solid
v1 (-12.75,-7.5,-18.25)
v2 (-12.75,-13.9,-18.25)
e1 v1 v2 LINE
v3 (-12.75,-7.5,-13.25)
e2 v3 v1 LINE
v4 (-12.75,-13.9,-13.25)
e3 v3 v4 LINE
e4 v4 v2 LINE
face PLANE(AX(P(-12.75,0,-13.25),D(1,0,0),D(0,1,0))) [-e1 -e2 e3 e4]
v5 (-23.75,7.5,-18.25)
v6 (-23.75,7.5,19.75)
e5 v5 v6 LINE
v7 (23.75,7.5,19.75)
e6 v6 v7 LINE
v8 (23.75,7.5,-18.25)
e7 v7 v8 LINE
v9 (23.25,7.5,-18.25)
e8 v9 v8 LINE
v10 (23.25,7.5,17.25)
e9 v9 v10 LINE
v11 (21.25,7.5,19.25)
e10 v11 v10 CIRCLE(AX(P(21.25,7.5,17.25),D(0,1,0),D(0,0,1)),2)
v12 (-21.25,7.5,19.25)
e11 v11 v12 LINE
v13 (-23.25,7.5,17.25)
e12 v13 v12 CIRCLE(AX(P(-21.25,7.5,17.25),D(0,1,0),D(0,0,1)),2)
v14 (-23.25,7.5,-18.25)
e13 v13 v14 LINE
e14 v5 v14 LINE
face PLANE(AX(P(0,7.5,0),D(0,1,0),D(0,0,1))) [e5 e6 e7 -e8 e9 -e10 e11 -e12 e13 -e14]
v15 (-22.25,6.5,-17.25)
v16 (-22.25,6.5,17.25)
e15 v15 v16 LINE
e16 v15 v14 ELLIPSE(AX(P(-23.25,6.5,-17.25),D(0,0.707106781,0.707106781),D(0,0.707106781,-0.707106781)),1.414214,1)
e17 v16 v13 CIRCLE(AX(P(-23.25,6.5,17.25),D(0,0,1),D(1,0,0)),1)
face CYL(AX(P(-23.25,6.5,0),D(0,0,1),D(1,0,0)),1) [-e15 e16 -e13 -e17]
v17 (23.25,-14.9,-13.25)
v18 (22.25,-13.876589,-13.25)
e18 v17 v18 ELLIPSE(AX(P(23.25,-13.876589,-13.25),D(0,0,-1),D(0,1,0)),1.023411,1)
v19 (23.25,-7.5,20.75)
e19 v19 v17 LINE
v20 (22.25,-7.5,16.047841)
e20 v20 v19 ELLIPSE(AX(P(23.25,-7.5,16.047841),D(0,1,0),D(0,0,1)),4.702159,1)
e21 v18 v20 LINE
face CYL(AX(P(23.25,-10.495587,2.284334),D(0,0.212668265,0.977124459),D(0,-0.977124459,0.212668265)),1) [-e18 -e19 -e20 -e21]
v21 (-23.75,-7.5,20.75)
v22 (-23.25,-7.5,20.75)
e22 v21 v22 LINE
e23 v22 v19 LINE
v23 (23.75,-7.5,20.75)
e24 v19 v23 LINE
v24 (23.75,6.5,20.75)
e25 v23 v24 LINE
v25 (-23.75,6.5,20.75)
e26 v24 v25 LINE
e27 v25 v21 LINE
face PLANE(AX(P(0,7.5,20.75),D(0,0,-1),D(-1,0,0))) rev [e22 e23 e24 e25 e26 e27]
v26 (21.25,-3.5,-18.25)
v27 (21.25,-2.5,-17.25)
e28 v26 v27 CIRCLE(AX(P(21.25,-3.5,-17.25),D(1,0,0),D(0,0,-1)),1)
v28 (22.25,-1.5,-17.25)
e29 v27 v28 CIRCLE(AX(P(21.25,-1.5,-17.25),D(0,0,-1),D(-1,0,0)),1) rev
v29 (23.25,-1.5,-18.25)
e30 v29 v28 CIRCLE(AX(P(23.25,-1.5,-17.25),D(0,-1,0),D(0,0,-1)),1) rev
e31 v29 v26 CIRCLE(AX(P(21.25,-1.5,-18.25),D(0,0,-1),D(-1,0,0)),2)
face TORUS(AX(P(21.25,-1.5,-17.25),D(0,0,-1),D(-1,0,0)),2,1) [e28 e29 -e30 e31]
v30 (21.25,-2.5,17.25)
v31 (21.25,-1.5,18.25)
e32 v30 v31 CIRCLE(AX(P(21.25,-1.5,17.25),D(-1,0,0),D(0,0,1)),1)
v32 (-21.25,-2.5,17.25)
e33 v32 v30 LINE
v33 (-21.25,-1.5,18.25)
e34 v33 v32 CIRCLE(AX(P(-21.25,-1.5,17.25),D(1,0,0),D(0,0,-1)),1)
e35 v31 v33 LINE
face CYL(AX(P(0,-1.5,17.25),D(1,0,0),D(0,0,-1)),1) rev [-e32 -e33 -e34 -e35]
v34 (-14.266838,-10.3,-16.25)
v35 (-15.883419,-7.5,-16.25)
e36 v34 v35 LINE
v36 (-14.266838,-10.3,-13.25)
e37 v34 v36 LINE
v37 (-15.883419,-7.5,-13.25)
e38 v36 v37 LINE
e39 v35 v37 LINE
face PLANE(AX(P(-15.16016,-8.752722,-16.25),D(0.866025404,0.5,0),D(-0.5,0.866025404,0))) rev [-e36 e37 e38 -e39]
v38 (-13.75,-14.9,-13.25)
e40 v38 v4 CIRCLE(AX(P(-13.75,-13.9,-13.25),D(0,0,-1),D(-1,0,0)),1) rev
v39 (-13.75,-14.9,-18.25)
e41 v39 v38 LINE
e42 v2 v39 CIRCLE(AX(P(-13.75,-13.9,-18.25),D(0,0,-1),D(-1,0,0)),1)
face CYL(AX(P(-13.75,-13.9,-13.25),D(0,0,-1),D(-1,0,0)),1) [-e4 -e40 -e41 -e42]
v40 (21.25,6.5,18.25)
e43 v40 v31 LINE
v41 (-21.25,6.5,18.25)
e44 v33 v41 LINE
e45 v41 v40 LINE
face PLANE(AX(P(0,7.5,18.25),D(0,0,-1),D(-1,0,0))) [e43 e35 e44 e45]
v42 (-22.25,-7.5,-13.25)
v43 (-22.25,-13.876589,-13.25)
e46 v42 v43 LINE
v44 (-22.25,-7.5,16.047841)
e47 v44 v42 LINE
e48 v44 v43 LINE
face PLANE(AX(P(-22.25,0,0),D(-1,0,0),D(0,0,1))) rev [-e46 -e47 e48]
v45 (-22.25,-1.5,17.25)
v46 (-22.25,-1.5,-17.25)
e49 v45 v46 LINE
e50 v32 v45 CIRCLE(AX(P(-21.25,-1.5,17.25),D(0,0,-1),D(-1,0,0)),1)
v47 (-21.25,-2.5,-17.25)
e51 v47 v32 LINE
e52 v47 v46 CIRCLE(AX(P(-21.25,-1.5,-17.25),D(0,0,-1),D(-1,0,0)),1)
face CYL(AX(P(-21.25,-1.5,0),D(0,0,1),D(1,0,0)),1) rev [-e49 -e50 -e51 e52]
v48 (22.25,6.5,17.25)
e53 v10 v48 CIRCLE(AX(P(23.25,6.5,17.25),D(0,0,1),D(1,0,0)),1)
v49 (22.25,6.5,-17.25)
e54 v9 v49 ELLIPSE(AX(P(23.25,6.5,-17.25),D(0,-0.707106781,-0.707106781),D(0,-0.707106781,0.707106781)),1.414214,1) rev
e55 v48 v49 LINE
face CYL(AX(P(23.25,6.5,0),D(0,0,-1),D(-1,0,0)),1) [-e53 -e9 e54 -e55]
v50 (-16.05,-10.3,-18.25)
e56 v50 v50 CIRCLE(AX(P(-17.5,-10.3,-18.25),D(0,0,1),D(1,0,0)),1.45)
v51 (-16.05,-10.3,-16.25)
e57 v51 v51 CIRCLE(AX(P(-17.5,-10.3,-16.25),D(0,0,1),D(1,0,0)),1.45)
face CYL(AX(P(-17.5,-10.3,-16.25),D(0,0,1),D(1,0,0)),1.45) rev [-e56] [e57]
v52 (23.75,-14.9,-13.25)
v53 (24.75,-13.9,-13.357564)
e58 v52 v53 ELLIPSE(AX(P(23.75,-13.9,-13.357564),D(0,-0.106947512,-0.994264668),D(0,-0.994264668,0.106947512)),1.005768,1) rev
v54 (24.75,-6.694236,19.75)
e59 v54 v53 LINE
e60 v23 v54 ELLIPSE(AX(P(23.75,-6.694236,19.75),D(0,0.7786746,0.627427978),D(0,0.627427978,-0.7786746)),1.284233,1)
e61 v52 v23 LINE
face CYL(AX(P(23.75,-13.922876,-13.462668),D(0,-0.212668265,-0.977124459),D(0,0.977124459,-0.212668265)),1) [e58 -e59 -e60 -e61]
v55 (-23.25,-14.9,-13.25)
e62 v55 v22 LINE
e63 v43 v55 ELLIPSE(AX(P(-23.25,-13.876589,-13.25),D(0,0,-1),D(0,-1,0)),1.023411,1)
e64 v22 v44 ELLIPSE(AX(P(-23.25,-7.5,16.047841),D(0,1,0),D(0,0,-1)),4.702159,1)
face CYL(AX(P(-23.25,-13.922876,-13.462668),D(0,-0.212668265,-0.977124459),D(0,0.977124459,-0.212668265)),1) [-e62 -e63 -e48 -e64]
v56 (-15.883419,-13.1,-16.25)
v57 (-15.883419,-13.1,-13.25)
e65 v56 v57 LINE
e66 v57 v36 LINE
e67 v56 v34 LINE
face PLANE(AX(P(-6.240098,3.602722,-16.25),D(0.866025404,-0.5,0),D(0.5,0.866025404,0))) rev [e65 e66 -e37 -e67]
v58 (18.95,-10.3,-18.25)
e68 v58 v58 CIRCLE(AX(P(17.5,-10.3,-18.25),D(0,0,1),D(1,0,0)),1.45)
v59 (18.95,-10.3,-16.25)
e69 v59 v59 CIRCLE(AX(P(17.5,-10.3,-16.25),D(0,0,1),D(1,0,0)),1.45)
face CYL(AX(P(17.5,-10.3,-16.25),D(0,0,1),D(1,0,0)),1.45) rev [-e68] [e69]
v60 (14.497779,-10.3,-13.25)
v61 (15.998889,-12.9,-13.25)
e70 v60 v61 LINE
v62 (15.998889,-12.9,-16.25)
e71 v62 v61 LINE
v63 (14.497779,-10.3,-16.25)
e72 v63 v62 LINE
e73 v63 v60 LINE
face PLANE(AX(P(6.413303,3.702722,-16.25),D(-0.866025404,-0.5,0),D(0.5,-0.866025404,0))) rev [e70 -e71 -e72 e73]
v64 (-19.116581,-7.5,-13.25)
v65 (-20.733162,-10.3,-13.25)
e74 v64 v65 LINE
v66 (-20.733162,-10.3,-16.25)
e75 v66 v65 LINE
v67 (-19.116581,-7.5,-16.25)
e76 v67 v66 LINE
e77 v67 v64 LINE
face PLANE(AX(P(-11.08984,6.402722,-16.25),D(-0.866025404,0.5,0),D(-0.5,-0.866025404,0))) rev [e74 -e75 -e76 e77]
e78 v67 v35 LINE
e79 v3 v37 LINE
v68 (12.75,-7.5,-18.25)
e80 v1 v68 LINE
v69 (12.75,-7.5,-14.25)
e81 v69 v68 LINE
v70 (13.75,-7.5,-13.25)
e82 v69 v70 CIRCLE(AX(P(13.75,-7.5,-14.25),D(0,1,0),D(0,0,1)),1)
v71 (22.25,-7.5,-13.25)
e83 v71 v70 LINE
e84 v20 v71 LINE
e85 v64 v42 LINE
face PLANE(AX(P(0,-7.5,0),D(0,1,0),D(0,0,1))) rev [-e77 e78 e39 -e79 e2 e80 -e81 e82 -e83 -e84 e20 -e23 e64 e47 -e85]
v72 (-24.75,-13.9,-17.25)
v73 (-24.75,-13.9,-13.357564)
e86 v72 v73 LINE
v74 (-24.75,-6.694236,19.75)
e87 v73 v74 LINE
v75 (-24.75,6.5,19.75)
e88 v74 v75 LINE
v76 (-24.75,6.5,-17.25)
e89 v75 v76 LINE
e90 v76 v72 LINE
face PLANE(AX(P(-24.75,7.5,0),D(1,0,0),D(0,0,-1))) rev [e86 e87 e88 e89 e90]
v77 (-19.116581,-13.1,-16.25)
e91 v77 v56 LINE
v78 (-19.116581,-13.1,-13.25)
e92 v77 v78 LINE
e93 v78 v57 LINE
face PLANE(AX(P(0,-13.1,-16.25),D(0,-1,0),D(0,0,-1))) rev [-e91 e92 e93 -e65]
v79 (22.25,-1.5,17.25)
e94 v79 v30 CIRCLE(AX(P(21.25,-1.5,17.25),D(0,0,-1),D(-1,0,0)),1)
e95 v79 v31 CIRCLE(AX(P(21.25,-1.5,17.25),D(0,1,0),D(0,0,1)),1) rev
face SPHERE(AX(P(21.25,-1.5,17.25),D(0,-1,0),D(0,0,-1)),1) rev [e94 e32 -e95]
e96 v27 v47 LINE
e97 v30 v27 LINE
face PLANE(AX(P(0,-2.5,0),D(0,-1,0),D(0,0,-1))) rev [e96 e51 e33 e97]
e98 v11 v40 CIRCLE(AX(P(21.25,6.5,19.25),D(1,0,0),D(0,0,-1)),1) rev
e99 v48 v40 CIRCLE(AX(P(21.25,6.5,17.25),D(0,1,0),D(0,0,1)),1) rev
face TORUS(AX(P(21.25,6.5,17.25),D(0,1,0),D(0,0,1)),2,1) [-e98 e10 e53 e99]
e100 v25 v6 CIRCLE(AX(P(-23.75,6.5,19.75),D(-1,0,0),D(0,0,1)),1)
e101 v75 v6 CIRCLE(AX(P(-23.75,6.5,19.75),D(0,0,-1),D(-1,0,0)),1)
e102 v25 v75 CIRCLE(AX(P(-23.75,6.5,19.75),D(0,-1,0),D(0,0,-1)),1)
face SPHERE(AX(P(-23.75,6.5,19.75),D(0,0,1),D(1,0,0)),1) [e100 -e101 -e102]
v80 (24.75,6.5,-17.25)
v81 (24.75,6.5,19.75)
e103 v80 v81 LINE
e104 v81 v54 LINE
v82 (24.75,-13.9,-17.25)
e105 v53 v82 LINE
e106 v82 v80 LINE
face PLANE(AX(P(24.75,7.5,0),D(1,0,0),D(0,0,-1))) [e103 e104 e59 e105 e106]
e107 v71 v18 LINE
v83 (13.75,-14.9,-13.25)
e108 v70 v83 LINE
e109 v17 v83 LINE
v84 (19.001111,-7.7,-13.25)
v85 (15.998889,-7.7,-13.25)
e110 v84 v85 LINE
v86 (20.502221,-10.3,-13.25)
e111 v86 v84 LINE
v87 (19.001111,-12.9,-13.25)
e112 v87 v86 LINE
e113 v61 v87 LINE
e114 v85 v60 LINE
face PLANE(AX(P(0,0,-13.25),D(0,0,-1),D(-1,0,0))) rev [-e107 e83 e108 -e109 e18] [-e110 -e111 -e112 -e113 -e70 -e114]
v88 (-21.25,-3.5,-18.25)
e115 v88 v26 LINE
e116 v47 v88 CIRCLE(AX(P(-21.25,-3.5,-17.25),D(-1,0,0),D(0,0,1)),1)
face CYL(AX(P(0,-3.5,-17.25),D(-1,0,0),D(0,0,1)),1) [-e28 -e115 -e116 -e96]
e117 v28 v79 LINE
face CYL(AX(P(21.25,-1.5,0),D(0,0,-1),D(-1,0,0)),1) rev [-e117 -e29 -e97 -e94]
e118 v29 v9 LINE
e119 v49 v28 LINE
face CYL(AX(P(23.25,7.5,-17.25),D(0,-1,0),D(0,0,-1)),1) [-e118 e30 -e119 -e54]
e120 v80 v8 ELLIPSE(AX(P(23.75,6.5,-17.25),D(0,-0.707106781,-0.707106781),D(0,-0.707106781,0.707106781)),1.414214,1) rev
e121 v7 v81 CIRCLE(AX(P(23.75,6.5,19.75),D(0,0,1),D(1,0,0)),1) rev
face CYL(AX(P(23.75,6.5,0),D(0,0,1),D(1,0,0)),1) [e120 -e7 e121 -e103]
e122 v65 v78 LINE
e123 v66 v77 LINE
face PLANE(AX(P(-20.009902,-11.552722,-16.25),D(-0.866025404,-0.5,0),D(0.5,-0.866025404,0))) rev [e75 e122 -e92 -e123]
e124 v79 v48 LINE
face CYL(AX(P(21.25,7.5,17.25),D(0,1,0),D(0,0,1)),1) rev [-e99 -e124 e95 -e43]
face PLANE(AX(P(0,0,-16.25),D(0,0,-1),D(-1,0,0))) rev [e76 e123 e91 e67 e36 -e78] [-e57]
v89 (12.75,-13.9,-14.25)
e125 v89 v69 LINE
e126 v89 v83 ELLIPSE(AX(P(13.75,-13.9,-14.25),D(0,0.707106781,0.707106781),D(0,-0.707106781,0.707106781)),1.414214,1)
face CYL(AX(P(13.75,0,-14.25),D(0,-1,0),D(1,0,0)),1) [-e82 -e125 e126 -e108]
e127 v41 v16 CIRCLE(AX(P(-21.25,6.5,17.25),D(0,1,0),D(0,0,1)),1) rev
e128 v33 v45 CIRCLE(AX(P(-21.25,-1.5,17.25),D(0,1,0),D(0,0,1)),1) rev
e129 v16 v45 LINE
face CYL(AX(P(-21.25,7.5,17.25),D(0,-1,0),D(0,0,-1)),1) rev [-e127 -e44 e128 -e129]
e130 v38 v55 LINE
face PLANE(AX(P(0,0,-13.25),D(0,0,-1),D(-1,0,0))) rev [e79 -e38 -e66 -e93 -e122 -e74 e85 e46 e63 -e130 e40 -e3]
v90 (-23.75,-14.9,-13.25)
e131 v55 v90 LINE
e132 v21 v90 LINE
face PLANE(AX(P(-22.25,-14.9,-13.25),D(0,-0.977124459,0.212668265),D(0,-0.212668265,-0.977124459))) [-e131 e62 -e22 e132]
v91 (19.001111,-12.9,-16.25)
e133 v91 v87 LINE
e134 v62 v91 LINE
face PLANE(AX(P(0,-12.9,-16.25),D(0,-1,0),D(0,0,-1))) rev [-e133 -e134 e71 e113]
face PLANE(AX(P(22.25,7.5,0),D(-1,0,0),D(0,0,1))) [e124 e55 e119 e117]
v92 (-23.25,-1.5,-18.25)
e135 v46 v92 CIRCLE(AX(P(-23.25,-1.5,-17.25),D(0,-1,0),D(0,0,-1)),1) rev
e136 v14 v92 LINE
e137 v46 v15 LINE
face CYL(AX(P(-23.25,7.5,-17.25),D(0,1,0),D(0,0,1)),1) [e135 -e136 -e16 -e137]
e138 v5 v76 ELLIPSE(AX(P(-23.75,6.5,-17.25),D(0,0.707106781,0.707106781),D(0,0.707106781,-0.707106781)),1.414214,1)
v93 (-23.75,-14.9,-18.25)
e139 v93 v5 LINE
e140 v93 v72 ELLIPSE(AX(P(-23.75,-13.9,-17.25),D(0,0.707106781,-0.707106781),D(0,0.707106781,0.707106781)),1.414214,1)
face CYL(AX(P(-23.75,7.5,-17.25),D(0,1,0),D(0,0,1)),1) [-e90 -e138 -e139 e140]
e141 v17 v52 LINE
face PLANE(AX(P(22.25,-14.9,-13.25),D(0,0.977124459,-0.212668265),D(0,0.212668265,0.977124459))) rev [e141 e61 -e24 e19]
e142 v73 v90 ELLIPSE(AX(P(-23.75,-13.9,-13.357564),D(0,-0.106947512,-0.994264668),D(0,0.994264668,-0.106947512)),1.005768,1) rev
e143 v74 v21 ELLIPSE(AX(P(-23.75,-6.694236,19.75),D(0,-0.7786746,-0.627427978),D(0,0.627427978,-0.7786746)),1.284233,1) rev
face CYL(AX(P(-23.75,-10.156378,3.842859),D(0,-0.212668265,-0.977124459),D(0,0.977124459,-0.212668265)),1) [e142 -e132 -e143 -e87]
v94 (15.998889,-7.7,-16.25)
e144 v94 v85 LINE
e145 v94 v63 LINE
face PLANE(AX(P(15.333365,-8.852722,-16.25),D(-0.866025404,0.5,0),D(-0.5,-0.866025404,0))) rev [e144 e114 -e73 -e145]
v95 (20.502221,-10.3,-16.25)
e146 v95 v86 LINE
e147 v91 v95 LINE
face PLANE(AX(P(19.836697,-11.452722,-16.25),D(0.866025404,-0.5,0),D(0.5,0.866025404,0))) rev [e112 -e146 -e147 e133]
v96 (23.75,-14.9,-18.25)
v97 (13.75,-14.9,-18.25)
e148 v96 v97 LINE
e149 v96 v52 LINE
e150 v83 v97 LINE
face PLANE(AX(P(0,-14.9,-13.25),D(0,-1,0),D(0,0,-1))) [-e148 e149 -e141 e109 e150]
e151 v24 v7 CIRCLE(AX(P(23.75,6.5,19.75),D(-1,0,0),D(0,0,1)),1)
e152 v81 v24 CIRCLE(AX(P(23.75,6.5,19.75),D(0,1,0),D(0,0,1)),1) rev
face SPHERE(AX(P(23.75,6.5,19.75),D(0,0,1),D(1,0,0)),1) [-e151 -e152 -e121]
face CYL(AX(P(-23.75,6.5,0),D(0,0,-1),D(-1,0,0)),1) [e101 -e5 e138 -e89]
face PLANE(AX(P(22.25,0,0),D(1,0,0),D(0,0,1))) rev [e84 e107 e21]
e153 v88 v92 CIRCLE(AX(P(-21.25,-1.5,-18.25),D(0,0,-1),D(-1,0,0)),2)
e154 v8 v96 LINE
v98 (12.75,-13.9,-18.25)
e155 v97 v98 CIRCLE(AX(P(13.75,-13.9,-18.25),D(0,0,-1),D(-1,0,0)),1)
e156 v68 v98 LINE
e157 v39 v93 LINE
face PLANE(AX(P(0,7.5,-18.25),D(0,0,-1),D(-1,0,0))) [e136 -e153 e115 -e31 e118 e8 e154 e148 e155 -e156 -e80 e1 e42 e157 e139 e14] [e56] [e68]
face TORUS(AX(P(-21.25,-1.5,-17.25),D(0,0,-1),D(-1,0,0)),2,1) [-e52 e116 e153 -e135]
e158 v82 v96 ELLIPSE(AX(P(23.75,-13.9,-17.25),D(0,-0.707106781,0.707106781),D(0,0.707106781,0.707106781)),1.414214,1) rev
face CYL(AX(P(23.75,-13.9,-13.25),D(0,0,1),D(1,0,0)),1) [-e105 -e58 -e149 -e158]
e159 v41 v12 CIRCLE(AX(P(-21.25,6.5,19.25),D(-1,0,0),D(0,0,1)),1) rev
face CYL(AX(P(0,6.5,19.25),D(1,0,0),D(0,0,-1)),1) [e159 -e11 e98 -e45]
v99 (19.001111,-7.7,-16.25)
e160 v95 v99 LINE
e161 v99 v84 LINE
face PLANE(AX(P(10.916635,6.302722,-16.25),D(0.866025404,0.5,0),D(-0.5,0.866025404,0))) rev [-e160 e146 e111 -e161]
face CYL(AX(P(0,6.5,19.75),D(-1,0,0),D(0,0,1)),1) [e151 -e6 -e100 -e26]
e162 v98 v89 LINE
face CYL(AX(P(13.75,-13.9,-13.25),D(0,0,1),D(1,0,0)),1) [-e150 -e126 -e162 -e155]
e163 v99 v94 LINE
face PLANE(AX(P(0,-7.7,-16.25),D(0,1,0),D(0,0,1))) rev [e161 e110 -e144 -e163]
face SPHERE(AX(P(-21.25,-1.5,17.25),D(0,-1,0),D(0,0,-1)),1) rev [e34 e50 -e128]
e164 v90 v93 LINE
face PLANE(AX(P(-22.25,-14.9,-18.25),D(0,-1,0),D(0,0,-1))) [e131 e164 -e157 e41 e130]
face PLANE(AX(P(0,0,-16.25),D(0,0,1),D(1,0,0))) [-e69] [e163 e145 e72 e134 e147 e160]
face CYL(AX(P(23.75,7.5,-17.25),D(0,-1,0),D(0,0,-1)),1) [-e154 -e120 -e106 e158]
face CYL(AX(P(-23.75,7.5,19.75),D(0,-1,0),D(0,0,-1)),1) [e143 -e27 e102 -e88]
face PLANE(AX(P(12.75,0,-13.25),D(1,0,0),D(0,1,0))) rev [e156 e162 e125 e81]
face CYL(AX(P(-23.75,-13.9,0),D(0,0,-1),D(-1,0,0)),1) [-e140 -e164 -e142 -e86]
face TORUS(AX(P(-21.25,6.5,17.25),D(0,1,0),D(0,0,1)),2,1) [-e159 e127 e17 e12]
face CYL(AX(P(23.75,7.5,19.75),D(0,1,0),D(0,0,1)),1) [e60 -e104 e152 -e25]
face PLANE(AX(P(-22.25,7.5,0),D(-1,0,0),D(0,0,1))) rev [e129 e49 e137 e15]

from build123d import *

# Parameters (mm, degrees)
BOSS_EXTRUDE1_DEPTH    = 7.5
BOSS_EXTRUDE2_START    = -7.5
SKETCH1_3_W            = 44.5
SKETCH1_3_H            = 36.5
BOSS_EXTRUDE2_DEPTH    = 5
BOSS_EXTRUDE3_DEPTH    = 2.5
BOSS_EXTRUDE4_DEPTH    = 5
CUT_EXTRUDE1_START     = -5
CUT_EXTRUDE1_DEPTH     = 3
M2_5_CLEARANCE_HOLE1_D = 2.9
MIRROR1_START          = -16.25
MIRROR1_DEPTH          = 3
MIRROR1_START_2        = -18.25
MIRROR1_2_OUTLINE_R    = 1.45
MIRROR1_2_DEPTH        = 2
MIRROR1_3_DEPTH        = 3
MIRROR1_START_3        = 22.25
MIRROR1_4_DEPTH        = 2.5
FILLET1_R              = 1
FILLET2_R              = 1
FILLET6_R              = 1
FILLET7_R              = 1
FILLET8_R              = 1


with BuildPart() as part:
    # Sketch1 → Boss-Extrude1 (new, symmetric)
    with BuildSketch(Plane(origin=(0, 0, 0), x_dir=(1, 0, 0), z_dir=(0, 1, 0))):
        Polygon((22.25, -18.25), (-22.25, -18.25), (-22.25, 18.25), (-24.75, 18.25), (-24.75, -20.75), (24.75, -20.75), (24.75, 18.25), (22.25, 18.25), align=None)
    extrude(amount=BOSS_EXTRUDE1_DEPTH, both=True)

    # Sketch1<3> → Boss-Extrude2 (add)
    with BuildSketch(Plane(origin=(0, 0, 0), x_dir=(1, 0, 0), z_dir=(0, 1, 0)).offset(BOSS_EXTRUDE2_START)):
        Rectangle(SKETCH1_3_W, SKETCH1_3_H)
    extrude(amount=BOSS_EXTRUDE2_DEPTH)

    # Sketch5 → Boss-Extrude3 (add)
    with BuildSketch(Plane(origin=(-24.75, 32.25, 0), x_dir=(0, 1, 0), z_dir=(-1, 0, 0))):
        Polygon((-47.15, 18.25), (-39.75, 18.25), (-39.75, -20.75), (-47.15, 13.25), align=None)
    extrude(amount=-BOSS_EXTRUDE3_DEPTH)

    # Sketch6 → Boss-Extrude4 (add)
    with BuildSketch(Plane(origin=(0, 0, -18.25), x_dir=(-1, 0, 0), z_dir=(0, 0, -1))):
        Polygon((-12.75, -10.3), (-14.266838493, -10.3), (-15.883419246, -13.1), (-19.116580754, -13.1), (-20.733161507, -10.3), (-19.116580754, -7.5), (-22.25, -7.5), (-22.25, -14.9), (-12.75, -14.9), align=None)
        Polygon((22.25, -7.5), (12.75, -7.5), (12.75, -10.3), (12.75, -14.9), (22.25, -14.9), align=None)
    extrude(amount=-BOSS_EXTRUDE4_DEPTH)

    # Sketch6<3> → Cut-Extrude1 (cut)
    with BuildSketch(Plane(origin=(0, 0, -18.25), x_dir=(-1, 0, 0), z_dir=(0, 0, -1)).offset(CUT_EXTRUDE1_START)):
        Polygon((19.0011107, -7.7), (15.9988893, -7.7), (14.4977786, -10.3), (15.9988893, -12.9), (19.0011107, -12.9), (20.5022214, -10.3), align=None)
    extrude(amount=CUT_EXTRUDE1_DEPTH, mode=Mode.SUBTRACT)

    # M2.5 Clearance Hole1 (through all)
    with Locations(Plane.XY.offset(-16.25)):
        with Locations((-17.5, -10.3), (17.5, -10.3)):
            Hole(M2_5_CLEARANCE_HOLE1_D / 2)

    # Mirror1: read off the stored shape, not the designer's step
    # Mirror1 outline → Mirror1 (cut)
    with BuildSketch(Plane.XY.offset(MIRROR1_START)):
        Polygon((-14.266838493, -10.3), (-15.883419246, -7.5), (-19.116580754, -7.5), (-20.733161507, -10.3), (-19.116580754, -13.1), (-15.883419246, -13.1), align=None)
        Polygon((-15.9988893, -12.9), (-19.0011107, -12.9), (-20.5022214, -10.3), (-19.0011107, -7.7), (-15.9988893, -7.7), (-14.4977786, -10.3), align=None, mode=Mode.SUBTRACT)
    extrude(amount=MIRROR1_DEPTH, mode=Mode.SUBTRACT)

    # Mirror1 2 outline → Mirror1 2 (add)
    with BuildSketch(Plane.XY.offset(MIRROR1_START_2)):
        Polygon((20.733161507, -10.3), (19.116580754, -7.5), (12.75, -7.5), (12.75, -10.3), (14.266838493, -10.3), (15.883419246, -13.1), (19.116580754, -13.1), align=None)
        with Locations((17.5, -10.3)):
            Circle(MIRROR1_2_OUTLINE_R, mode=Mode.SUBTRACT)
    extrude(amount=MIRROR1_2_DEPTH)

    # Mirror1 3 outline → Mirror1 3 (add)
    with BuildSketch(Plane.XY.offset(MIRROR1_START)):
        Polygon((20.733161507, -10.3), (19.116580754, -7.5), (12.75, -7.5), (12.75, -10.3), (14.266838493, -10.3), (15.883419246, -13.1), (19.116580754, -13.1), align=None)
        Polygon((15.9988893, -7.7), (19.0011107, -7.7), (20.5022214, -10.3), (19.0011107, -12.9), (15.9988893, -12.9), (14.4977786, -10.3), align=None, mode=Mode.SUBTRACT)
    extrude(amount=MIRROR1_3_DEPTH)

    # Mirror1 4 outline → Mirror1 4 (add)
    with BuildSketch(Plane.YZ.offset(MIRROR1_START_3)):
        Polygon((-14.9, -13.25), (-14.9, -18.25), (-7.5, -18.25), (-7.5, 20.75), align=None)
    extrude(amount=MIRROR1_4_DEPTH)

    # Fillet1
    fillet1_edges = [part.edges().sort_by_distance(p)[0] for p in [
        (22.25, 7.5, 0),
        (-22.25, 2.5, -18.25),
        (-22.25, 2.5, 18.25),
        (22.25, 2.5, 18.25),
        (22.25, 2.5, -18.25),
        (0, 7.5, 18.25),
        (-22.25, 7.5, 0),
        (-22.25, -2.5, 0),
        (0, -2.5, -18.25),
        (0, -2.5, 18.25),
        (22.25, -2.5, 0),
    ]]
    fillet(fillet1_edges, radius=FILLET1_R)

    # Fillet2
    fillet2_edges = [part.edges().sort_by_distance(p)[0] for p in [
        (24.75, -14.9, -15.75),
        (24.75, -11.2, 3.75),
        (24.75, 0, 20.75),
        (-24.75, 0, 20.75),
        (-24.75, -3.7, -18.25),
        (24.75, -3.7, -18.25),
        (-24.75, 7.5, 1.25),
        (-24.75, -14.9, -15.75),
        (-24.75, -11.2, 3.75),
        (24.75, 7.5, 1.25),
    ]]
    fillet(fillet2_edges, radius=FILLET2_R)

    # Fillet6
    fillet6_edges = [part.edges().sort_by_distance(p)[0] for p in [
        (-12.75, -14.9, -15.75),
        (12.75, -14.9, -15.75),
        (12.75, -11.2, -13.25),
    ]]
    fillet(fillet6_edges, radius=FILLET6_R)

    # Fillet7
    # the kernel refuses this fillet: 1 mm, written as the material it takes off along each edge
    with BuildSketch(Plane(origin=(23.75, 6.5, 19.75), x_dir=(0, 0, 1), z_dir=(0, 1, 0))) as fillet7_piece_1_section:
        Polygon((0, 0), (FILLET7_R, 0), (FILLET7_R, FILLET7_R), (0, FILLET7_R), align=None)
    fillet7_piece_1 = extrude(amount=FILLET7_R, mode=Mode.PRIVATE)
    fillet7_piece_1 = fillet7_piece_1 - Plane(origin=(23.75, 6.5, 19.75), x_dir=(-0.7071067811865476, 0, -0.7071067811865475), z_dir=(0, 1, 0)) * Sphere(FILLET7_R, mode=Mode.PRIVATE)
    add(fillet7_piece_1, mode=Mode.SUBTRACT)
    with BuildSketch(Plane(origin=(-23.75, 6.5, 19.75), x_dir=(0, 0, 1), z_dir=(0, 1, 0))) as fillet7_piece_2_section:
        Polygon((0, 0), (FILLET7_R, 0), (FILLET7_R, -FILLET7_R), (0, -FILLET7_R), align=None)
    fillet7_piece_2 = extrude(amount=FILLET7_R, mode=Mode.PRIVATE)
    fillet7_piece_2 = fillet7_piece_2 - Plane(origin=(-23.75, 6.5, 19.75), x_dir=(0.7071067811865475, 0, -0.7071067811865475), z_dir=(0, 1, 0)) * Sphere(FILLET7_R, mode=Mode.PRIVATE)
    add(fillet7_piece_2, mode=Mode.SUBTRACT)
    with BuildSketch(Plane(origin=(-23.75, 7.5, 20.75), x_dir=(0, 0, -1), z_dir=(1, 0, 0))) as fillet7_piece_3:
        with BuildLine():
            CenterArc((FILLET7_R, -FILLET7_R), FILLET7_R, 90, 90)
            Line((0, -FILLET7_R), (0, 0))
            Line((0, 0), (FILLET7_R, 0))
        make_face()
    extrude(amount=47.5, mode=Mode.SUBTRACT)

    # Fillet8
    fillet8_edges = [part.edges().sort_by_distance(p)[0] for p in [
        (22.25, -11.2, 3.75),
        (-22.25, -11.2, 3.75),
    ]]
    fillet(fillet8_edges, radius=FILLET8_R)


solid = part.part
